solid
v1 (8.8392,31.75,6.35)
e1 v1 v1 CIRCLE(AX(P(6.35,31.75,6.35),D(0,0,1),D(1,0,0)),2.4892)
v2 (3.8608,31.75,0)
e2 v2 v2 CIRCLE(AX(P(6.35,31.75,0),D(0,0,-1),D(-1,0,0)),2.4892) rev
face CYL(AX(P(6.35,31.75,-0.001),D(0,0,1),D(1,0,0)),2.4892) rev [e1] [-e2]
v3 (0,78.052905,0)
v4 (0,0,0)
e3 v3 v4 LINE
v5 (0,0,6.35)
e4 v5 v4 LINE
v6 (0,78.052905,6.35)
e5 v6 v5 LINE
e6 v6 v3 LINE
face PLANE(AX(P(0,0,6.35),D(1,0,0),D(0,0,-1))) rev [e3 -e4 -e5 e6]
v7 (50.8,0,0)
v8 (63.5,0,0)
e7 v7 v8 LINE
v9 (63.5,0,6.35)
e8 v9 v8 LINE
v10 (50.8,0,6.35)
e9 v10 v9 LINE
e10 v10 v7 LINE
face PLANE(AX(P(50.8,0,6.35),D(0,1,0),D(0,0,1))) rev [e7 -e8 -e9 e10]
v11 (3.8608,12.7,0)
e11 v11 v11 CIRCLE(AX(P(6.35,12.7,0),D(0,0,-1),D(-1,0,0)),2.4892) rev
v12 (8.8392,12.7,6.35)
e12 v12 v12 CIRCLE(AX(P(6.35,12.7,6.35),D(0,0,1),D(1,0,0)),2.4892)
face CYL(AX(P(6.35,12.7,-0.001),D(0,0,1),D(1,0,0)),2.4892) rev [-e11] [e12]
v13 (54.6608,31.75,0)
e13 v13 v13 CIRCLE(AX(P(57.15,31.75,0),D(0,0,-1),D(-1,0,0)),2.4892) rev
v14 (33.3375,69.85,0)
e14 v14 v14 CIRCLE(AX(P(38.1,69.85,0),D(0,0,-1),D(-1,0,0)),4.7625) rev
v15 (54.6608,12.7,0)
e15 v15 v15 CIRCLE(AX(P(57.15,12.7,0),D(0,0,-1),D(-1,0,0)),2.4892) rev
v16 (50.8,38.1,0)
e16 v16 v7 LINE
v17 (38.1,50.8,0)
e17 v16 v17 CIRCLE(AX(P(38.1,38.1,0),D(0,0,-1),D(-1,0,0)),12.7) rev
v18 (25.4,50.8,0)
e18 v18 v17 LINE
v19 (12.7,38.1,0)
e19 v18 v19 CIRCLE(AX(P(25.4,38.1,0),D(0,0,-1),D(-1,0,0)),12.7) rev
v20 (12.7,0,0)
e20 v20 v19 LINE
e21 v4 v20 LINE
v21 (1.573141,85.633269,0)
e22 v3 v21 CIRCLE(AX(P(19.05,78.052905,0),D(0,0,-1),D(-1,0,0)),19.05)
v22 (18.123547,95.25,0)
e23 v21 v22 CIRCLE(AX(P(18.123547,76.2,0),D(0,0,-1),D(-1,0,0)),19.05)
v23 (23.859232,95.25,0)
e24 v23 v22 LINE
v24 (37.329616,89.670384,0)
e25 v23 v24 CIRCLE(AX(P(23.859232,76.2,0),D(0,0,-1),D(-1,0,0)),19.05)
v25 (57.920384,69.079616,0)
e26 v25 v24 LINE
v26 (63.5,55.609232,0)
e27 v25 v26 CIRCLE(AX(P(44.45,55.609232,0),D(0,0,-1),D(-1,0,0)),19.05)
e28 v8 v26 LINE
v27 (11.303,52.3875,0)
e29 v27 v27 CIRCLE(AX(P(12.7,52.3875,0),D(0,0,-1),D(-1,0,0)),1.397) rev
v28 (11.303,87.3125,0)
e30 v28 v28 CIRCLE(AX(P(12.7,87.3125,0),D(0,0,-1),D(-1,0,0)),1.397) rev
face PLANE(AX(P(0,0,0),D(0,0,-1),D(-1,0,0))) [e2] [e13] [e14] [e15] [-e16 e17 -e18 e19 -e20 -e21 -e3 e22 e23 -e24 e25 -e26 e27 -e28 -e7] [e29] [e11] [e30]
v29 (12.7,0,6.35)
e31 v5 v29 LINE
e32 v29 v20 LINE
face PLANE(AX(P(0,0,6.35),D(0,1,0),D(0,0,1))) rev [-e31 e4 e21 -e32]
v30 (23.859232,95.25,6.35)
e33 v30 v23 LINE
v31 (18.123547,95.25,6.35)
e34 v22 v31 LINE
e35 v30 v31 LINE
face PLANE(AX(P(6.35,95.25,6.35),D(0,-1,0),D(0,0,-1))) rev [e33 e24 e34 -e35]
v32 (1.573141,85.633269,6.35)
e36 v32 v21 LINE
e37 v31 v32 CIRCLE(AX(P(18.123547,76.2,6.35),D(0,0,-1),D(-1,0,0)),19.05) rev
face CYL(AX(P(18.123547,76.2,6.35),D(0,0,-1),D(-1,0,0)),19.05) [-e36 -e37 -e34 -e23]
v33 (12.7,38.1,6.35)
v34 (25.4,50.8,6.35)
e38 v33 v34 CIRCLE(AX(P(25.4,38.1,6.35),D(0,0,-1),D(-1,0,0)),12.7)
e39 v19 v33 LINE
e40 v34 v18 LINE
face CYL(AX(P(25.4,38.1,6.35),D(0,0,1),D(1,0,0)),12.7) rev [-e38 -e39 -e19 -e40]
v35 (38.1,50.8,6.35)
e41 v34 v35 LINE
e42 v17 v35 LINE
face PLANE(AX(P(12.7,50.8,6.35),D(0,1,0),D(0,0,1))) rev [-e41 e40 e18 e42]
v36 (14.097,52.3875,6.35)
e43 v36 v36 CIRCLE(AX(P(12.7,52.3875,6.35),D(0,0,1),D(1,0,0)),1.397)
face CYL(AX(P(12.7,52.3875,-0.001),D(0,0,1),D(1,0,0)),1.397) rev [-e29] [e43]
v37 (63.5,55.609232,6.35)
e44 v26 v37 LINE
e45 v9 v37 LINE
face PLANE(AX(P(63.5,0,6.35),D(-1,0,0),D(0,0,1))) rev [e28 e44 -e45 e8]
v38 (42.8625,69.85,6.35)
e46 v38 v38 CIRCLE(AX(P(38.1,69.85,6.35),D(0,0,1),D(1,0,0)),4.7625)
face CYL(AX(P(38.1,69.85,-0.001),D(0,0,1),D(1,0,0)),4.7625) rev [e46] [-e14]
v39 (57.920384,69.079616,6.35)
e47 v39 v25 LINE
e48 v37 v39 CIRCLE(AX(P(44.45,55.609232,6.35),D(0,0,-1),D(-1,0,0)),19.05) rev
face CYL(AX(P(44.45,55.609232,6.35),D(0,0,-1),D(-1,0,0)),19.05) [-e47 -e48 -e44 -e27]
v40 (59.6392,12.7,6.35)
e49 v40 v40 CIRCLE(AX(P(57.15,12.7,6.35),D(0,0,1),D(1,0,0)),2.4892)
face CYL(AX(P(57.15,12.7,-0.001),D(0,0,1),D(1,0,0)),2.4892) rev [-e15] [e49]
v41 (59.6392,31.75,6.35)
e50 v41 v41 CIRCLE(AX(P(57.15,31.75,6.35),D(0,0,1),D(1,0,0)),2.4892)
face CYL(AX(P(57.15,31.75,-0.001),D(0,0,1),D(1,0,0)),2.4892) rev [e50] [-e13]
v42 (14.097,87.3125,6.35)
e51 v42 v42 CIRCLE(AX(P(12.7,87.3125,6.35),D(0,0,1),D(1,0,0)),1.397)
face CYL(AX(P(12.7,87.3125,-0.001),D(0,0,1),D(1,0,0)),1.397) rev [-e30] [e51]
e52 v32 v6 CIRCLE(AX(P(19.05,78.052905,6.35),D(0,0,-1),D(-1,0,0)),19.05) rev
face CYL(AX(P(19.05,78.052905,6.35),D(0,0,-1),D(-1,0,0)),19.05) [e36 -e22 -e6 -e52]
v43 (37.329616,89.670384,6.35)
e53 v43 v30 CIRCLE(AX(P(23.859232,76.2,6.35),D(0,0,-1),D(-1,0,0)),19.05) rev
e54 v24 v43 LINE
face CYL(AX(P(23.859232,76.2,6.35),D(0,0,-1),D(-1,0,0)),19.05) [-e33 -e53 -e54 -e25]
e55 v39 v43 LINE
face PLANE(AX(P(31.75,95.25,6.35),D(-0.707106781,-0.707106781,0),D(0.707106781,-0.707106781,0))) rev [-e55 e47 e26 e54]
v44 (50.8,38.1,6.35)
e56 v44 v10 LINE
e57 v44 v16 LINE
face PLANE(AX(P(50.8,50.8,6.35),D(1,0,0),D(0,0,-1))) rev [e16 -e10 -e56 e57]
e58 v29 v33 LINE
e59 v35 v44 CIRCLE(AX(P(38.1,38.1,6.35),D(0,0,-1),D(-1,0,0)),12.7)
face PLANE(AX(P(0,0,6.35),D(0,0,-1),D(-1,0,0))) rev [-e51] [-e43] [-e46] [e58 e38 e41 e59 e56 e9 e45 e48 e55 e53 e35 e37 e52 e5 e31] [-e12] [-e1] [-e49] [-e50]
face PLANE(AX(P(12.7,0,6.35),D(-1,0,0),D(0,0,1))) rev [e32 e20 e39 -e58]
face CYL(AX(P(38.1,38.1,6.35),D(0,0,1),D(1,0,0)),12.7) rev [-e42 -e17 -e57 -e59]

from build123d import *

# Parameters (mm, degrees)
BOSS_EXTRUDE1_DEPTH = 6.35
CUT_EXTRUDE1_REACH  = 116.652
SKETCH2_R           = 2.4892
CUT_EXTRUDE3_REACH  = 116.652
SKETCH4_R           = 1.397
SKETCH4_R_2         = 4.7625
FILLET4_R           = 12.7
FILLET5_R           = 19.05


with BuildPart() as part:
    # Sketch1 → Boss-Extrude1 (new body)
    with BuildSketch(Plane.XY):
        Polygon((0, 0), (12.7, 0), (12.7, 50.8), (50.8, 50.8), (50.8, 0), (63.5, 0), (63.5, 63.5), (31.75, 95.25), (6.35, 95.25), (0, 82.55), align=None)
    extrude(amount=BOSS_EXTRUDE1_DEPTH)

    # Sketch2 → Cut-Extrude1 (cut, up to next)
    with BuildSketch(Plane.XY.offset(6.35), mode=Mode.PRIVATE) as cut_extrude1_sk1:
        with Locations((6.35, 12.7)):
            Circle(SKETCH2_R)
    cut_extrude1_tool1 = extrude(cut_extrude1_sk1.sketch, amount=-CUT_EXTRUDE1_REACH, mode=Mode.PRIVATE) & part.part
    # Sketch2 → Cut-Extrude1 (cut, up to next)
    with BuildSketch(Plane.XY.offset(6.35), mode=Mode.PRIVATE) as cut_extrude1_sk2:
        with Locations((6.35, 31.75)):
            Circle(SKETCH2_R)
    cut_extrude1_tool2 = extrude(cut_extrude1_sk2.sketch, amount=-CUT_EXTRUDE1_REACH, mode=Mode.PRIVATE) & part.part
    # Sketch2 → Cut-Extrude1 (cut, up to next)
    with BuildSketch(Plane.XY.offset(6.35), mode=Mode.PRIVATE) as cut_extrude1_sk3:
        with Locations((57.15, 12.7)):
            Circle(SKETCH2_R)
    cut_extrude1_tool3 = extrude(cut_extrude1_sk3.sketch, amount=-CUT_EXTRUDE1_REACH, mode=Mode.PRIVATE) & part.part
    # Sketch2 → Cut-Extrude1 (cut, up to next)
    with BuildSketch(Plane.XY.offset(6.35), mode=Mode.PRIVATE) as cut_extrude1_sk4:
        with Locations((57.15, 31.75)):
            Circle(SKETCH2_R)
    cut_extrude1_tool4 = extrude(cut_extrude1_sk4.sketch, amount=-CUT_EXTRUDE1_REACH, mode=Mode.PRIVATE) & part.part
    add(cut_extrude1_tool1.solids().sort_by_distance((6.35, 12.7, 6.35))[0], mode=Mode.SUBTRACT)
    add(cut_extrude1_tool2.solids().sort_by_distance((6.35, 31.75, 6.35))[0], mode=Mode.SUBTRACT)
    add(cut_extrude1_tool3.solids().sort_by_distance((57.15, 12.7, 6.35))[0], mode=Mode.SUBTRACT)
    add(cut_extrude1_tool4.solids().sort_by_distance((57.15, 31.75, 6.35))[0], mode=Mode.SUBTRACT)

    # Sketch4 → Cut-Extrude3 (cut, up to next)
    with BuildSketch(Plane.XY.offset(6.35), mode=Mode.PRIVATE) as cut_extrude3_sk1:
        with Locations((12.7, 52.3875)):
            Circle(SKETCH4_R)
    cut_extrude3_tool1 = extrude(cut_extrude3_sk1.sketch, amount=-CUT_EXTRUDE3_REACH, mode=Mode.PRIVATE) & part.part
    # Sketch4 → Cut-Extrude3 (cut, up to next)
    with BuildSketch(Plane.XY.offset(6.35), mode=Mode.PRIVATE) as cut_extrude3_sk2:
        with Locations((12.7, 87.3125)):
            Circle(SKETCH4_R)
    cut_extrude3_tool2 = extrude(cut_extrude3_sk2.sketch, amount=-CUT_EXTRUDE3_REACH, mode=Mode.PRIVATE) & part.part
    # Sketch4 → Cut-Extrude3 (cut, up to next)
    with BuildSketch(Plane.XY.offset(6.35), mode=Mode.PRIVATE) as cut_extrude3_sk3:
        with Locations((38.1, 69.85)):
            Circle(SKETCH4_R_2)
    cut_extrude3_tool3 = extrude(cut_extrude3_sk3.sketch, amount=-CUT_EXTRUDE3_REACH, mode=Mode.PRIVATE) & part.part
    add(cut_extrude3_tool1.solids().sort_by_distance((12.7, 52.3875, 6.35))[0], mode=Mode.SUBTRACT)
    add(cut_extrude3_tool2.solids().sort_by_distance((12.7, 87.3125, 6.35))[0], mode=Mode.SUBTRACT)
    add(cut_extrude3_tool3.solids().sort_by_distance((38.1, 69.85, 6.35))[0], mode=Mode.SUBTRACT)

    # Fillet4
    fillet4_edges = [part.edges().sort_by_distance(p)[0] for p in [
        (50.8, 50.8, 3.175),
        (12.7, 50.8, 3.175),
    ]]
    fillet(fillet4_edges, radius=FILLET4_R)

    # Fillet5
    # the kernel refuses this fillet: 19.05 mm, written as the material it takes off along each edge
    with BuildSketch(Plane(origin=(0, 82.55, -11.242737428), x_dir=(0, -1, 0), z_dir=(0, 0, 1))) as fillet5_piece_1:
        with BuildLine():
            CenterArc((FILLET5_R * 0.2360679775, FILLET5_R), FILLET5_R, 243.434948823, 26.565051177)
            Line((-FILLET5_R * 0.211145618, FILLET5_R * 0.105572809), (0, 0))
            Line((0, 0), (FILLET5_R * 0.2360679775, 0))
        make_face()
    extrude(amount=28.835474857, mode=Mode.SUBTRACT)
    with BuildSketch(Plane(origin=(6.35, 95.25, -29.433868714), x_dir=(-0.4472135954999575, -0.8944271909999162, 0), z_dir=(0, 0, 1))) as fillet5_piece_2:
        with BuildLine():
            CenterArc((FILLET5_R * 0.61803398875, FILLET5_R), FILLET5_R, 206.565051177, 63.434948823)
            Line((-FILLET5_R * 0.27639320225, FILLET5_R * 0.5527864045), (0, 0))
            Line((0, 0), (FILLET5_R * 0.61803398875, 0))
        make_face()
    extrude(amount=65.217737428, mode=Mode.SUBTRACT)
    with BuildSketch(Plane(origin=(31.75, 95.25, -19.726920908), x_dir=(-1, 0, 0), z_dir=(0, 0, 1)), Plane(origin=(63.5, 63.5, -19.726920908), x_dir=(-0.7071067811865476, 0.7071067811865476, 0), z_dir=(0, 0, 1))) as fillet5_piece_3:
        with BuildLine():
            CenterArc((FILLET5_R * 0.414213562373, FILLET5_R), FILLET5_R, 225, 45)
            Line((-FILLET5_R * 0.292893218813, FILLET5_R * 0.292893218813), (0, 0))
            Line((0, 0), (FILLET5_R * 0.414213562373, 0))
        make_face()
    extrude(amount=45.803841816, mode=Mode.SUBTRACT)


solid = part.part
